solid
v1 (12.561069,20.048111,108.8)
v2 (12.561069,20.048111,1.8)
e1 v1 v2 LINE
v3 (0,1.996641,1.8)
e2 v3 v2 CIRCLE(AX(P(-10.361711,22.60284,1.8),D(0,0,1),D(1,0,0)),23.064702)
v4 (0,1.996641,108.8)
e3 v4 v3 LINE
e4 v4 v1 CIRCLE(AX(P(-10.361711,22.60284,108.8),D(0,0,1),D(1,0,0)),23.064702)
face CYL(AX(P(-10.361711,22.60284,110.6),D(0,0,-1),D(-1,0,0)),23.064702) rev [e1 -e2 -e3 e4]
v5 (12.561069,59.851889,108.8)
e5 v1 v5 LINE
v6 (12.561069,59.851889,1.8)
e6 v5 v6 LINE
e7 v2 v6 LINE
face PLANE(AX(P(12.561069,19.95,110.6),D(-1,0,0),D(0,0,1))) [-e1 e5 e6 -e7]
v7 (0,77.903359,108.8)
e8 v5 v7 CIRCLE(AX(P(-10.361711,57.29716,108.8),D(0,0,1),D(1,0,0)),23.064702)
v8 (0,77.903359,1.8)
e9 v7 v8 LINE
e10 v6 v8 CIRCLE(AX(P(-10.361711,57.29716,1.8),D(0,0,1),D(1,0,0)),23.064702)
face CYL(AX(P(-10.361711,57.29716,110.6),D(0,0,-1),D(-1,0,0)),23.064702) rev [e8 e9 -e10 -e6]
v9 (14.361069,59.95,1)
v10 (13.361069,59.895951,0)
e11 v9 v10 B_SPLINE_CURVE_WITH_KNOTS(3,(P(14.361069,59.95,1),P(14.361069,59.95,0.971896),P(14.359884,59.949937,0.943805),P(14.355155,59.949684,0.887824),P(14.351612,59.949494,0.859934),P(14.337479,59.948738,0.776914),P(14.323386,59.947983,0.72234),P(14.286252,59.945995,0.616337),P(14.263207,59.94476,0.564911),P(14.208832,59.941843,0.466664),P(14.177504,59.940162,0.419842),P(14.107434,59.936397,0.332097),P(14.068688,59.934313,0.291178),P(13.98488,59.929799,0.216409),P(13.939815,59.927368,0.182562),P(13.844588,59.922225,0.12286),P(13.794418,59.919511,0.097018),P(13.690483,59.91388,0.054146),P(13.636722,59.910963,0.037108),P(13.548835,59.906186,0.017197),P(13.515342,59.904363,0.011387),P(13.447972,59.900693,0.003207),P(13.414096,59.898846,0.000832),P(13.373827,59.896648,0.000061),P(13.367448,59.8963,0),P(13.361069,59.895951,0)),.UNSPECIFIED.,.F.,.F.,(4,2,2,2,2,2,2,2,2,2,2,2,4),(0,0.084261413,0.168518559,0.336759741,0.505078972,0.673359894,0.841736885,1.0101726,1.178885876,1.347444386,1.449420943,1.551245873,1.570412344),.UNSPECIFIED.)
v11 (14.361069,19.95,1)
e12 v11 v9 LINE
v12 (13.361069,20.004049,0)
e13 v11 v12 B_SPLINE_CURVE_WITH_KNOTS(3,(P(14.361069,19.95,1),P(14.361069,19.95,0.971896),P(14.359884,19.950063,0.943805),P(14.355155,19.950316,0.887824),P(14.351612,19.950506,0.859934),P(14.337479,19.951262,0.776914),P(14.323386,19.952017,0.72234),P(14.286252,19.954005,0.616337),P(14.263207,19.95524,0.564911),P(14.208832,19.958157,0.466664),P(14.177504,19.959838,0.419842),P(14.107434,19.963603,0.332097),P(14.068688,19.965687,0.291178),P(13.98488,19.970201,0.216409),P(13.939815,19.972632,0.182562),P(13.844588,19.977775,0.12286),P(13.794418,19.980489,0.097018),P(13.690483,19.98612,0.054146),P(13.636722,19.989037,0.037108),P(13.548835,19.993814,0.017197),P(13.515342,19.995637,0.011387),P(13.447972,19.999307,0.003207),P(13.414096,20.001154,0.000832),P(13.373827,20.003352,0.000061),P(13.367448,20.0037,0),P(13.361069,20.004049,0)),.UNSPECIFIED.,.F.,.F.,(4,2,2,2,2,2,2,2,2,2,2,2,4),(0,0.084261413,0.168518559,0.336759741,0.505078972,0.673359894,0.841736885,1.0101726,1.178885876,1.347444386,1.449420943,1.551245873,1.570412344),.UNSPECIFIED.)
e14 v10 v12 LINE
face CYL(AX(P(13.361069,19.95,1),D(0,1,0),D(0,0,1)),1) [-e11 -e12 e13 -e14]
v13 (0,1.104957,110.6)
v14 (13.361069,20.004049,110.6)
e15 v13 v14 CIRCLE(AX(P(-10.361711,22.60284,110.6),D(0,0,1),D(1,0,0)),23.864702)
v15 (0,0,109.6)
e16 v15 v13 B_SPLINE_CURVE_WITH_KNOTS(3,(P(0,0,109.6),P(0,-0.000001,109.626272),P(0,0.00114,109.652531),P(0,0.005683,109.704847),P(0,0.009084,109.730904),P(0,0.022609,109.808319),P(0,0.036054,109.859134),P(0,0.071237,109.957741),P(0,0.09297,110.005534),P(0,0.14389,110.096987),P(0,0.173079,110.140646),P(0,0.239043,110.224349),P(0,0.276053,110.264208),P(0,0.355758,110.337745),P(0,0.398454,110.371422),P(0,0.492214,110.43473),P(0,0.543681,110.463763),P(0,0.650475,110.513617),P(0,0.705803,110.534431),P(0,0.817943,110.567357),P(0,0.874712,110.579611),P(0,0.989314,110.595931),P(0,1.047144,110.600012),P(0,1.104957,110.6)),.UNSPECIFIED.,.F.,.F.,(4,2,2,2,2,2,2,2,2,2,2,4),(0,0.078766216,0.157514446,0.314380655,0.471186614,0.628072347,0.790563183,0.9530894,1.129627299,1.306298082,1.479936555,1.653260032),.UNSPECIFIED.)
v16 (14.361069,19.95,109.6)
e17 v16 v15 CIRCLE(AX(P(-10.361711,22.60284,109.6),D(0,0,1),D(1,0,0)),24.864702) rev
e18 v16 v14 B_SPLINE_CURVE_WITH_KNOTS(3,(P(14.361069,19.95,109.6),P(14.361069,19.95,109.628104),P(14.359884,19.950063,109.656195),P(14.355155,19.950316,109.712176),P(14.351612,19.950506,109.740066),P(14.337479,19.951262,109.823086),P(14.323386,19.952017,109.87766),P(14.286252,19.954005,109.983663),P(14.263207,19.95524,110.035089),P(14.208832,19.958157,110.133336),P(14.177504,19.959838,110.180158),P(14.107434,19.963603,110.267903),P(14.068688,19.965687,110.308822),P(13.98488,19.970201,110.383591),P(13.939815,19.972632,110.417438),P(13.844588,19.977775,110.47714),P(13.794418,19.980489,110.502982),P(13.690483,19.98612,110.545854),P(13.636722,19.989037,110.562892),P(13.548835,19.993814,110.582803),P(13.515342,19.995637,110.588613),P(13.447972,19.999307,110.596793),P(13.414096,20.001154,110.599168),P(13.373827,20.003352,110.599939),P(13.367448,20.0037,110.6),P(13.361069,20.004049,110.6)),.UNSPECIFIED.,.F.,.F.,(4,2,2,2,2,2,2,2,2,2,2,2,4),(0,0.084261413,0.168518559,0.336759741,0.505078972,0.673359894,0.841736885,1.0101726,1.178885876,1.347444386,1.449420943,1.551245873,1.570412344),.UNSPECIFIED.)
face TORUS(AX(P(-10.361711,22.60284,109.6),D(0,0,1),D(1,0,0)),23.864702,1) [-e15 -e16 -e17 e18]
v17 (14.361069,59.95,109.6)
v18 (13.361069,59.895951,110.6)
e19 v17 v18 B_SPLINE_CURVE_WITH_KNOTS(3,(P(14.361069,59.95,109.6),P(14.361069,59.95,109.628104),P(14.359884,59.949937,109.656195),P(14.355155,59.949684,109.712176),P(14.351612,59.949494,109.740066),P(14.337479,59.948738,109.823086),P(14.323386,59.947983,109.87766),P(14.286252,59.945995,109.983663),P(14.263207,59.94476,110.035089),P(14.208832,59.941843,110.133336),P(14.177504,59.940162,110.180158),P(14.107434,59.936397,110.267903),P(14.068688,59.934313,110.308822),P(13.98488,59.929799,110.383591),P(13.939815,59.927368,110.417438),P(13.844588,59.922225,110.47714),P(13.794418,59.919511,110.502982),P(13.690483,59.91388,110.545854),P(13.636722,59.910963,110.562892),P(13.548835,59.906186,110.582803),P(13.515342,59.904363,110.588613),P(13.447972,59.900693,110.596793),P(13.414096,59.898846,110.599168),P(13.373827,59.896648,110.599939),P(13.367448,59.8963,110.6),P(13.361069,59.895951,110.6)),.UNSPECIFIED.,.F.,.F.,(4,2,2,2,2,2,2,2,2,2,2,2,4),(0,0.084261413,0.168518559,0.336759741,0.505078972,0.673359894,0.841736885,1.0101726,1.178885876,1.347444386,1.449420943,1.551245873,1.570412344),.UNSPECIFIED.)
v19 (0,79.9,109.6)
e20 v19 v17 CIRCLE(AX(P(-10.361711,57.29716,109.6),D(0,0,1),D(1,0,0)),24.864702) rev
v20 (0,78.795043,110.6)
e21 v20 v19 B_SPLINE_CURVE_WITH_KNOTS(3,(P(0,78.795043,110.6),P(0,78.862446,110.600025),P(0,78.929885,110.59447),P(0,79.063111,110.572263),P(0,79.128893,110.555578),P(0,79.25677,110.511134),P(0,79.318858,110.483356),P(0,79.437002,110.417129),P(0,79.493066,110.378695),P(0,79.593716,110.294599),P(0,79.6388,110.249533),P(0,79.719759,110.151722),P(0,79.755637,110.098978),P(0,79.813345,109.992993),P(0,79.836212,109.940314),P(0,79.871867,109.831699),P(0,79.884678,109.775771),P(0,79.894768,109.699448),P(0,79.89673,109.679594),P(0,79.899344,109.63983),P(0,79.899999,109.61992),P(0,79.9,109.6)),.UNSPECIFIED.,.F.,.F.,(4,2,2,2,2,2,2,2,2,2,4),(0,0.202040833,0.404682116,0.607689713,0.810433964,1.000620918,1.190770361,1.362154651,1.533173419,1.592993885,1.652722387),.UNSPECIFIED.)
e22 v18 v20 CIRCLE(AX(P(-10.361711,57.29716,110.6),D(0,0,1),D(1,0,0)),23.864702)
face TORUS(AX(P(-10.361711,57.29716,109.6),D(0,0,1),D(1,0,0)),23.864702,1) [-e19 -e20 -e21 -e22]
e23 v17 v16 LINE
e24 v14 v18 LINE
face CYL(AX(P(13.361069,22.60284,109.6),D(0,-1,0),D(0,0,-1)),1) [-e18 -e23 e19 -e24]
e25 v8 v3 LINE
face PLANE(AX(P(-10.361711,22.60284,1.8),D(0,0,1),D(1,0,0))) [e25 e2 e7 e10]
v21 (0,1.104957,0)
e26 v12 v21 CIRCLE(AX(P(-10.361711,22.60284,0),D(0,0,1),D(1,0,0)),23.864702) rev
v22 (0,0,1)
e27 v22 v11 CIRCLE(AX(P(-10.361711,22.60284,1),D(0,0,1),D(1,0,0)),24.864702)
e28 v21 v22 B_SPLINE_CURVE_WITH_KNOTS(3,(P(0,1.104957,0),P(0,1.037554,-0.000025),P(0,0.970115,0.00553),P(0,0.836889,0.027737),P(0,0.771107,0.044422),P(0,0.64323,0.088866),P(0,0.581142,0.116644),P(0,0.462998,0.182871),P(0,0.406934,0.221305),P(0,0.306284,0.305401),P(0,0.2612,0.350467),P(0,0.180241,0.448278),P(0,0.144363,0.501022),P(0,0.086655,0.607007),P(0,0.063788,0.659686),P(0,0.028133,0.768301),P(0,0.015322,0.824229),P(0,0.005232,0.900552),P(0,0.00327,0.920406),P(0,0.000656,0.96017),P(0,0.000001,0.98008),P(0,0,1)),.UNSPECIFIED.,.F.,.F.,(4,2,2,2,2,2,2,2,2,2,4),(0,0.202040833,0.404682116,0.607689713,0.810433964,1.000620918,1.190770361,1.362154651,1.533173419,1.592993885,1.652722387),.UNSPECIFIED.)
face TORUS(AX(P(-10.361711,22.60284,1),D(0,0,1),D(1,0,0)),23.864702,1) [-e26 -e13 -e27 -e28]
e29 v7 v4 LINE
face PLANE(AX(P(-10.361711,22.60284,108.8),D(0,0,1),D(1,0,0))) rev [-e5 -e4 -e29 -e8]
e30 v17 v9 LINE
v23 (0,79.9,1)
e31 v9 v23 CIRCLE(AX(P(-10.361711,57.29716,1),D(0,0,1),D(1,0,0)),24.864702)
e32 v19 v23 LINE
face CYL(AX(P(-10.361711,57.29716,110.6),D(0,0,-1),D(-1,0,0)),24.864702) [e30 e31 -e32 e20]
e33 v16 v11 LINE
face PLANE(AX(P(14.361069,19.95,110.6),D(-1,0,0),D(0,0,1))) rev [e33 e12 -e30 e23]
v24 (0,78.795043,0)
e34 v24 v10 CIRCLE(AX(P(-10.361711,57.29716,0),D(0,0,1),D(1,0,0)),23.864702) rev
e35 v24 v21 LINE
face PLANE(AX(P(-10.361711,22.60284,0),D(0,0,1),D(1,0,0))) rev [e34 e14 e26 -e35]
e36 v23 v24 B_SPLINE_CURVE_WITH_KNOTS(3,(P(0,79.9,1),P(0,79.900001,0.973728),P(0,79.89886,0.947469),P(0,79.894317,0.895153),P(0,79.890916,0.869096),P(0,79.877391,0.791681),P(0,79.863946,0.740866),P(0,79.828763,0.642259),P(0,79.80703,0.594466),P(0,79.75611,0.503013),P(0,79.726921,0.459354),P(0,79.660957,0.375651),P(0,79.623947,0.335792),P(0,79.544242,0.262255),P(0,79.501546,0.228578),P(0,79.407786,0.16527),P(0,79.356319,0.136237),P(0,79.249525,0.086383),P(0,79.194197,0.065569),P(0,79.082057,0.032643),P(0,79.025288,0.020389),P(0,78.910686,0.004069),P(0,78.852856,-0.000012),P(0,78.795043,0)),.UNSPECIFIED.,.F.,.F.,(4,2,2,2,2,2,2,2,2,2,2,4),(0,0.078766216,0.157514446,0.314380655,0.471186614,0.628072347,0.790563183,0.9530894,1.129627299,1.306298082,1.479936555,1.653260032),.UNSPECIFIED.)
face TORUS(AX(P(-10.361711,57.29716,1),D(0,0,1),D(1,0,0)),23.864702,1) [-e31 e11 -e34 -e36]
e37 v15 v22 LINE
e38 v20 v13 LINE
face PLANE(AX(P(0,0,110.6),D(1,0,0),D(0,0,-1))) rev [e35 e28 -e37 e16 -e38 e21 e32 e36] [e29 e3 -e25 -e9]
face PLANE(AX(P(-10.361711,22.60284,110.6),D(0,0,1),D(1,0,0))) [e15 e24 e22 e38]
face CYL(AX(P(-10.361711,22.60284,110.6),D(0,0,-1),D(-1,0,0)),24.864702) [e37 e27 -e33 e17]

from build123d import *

# Parameters (mm, degrees)
MAIN_SHAPE_DEPTH = 110.6
HOLLOW_T         = -1.8
FILLETS_R        = 1


with BuildPart() as part:
    # Sketch for the main shape → Main shape (new body)
    with BuildSketch(Plane.XY):
        with BuildLine():
            Line((14.361069392, 19.95), (14.361069392, 59.95))
            ThreePointArc((14.361069392, 59.95), (9.818254591, 71.823770849), (0, 79.9))
            Line((0, 79.9), (0, 0))
            ThreePointArc((0, 0), (9.818254591, 8.076229151), (14.361069392, 19.95))
        make_face()
    extrude(amount=MAIN_SHAPE_DEPTH)

    # Hollow
    hollow_openings = [part.faces().sort_by_distance(p)[0] for p in [
        (0, 39.95, 55.3),
    ]]
    offset(amount=HOLLOW_T, openings=hollow_openings, kind=Kind.INTERSECTION)

    # Fillets
    # the kernel refuses this fillet: 1 mm, written as the material it takes off along each edge
    with BuildSketch(Plane(origin=(-10.361710586, 57.297160312, 110.6), x_dir=(0.9999799478441757, 0.006332764764284822, 0), z_dir=(0.006332764764284822, -0.9999799478441757, 0))) as fillets_piece_1:
        with BuildLine():
            CenterArc((24.864702054 - FILLETS_R, -FILLETS_R), FILLETS_R, 0, 90)
            Line((24.864702054 - FILLETS_R, 0), (24.864702054, 0))
            Line((24.864702054, 0), (24.864702054, -FILLETS_R))
        make_face()
    revolve(axis=Axis((-10.361710586, 57.297160312, 110.6), (0, 0, 1)), revolution_arc=70.771001335, mode=Mode.SUBTRACT)
    with BuildSketch(Plane(origin=(-10.361710586, 22.602839688, 110.6), x_dir=(0.32335851179223435, -0.9462765308573977, 0), z_dir=(-0.9462765308573977, -0.32335851179223435, 0))) as fillets_piece_2:
        with BuildLine():
            CenterArc((24.864702054 - FILLETS_R, -FILLETS_R), FILLETS_R, 0, 90)
            Line((24.864702054 - FILLETS_R, 0), (24.864702054, 0))
            Line((24.864702054, 0), (24.864702054, -FILLETS_R))
        make_face()
    revolve(axis=Axis((-10.361710586, 22.602839688, 110.6), (0, 0, 1)), revolution_arc=70.771001335, mode=Mode.SUBTRACT)
    with BuildSketch(Plane(origin=(-10.361710586, 57.297160312, 0), x_dir=(0.9999799478441757, 0.006332764764284822, 0), z_dir=(0.006332764764284822, -0.9999799478441757, 0))) as fillets_piece_3:
        with BuildLine():
            CenterArc((24.864702054 - FILLETS_R, FILLETS_R), FILLETS_R, 270, 90)
            Line((24.864702054 - FILLETS_R, 0), (24.864702054, 0))
            Line((24.864702054, 0), (24.864702054, FILLETS_R))
        make_face()
    revolve(axis=Axis((-10.361710586, 57.297160312, 0), (0, 0, 1)), revolution_arc=70.771001335, mode=Mode.SUBTRACT)
    with BuildSketch(Plane(origin=(14.361069392, 17.45, 0), x_dir=(0, 0, 1), z_dir=(0, 1, 0))) as fillets_piece_4:
        with BuildLine():
            CenterArc((FILLETS_R, -FILLETS_R), FILLETS_R, 90, 90)
            Line((0, -FILLETS_R), (0, 0))
            Line((0, 0), (FILLETS_R, 0))
        make_face()
    extrude(amount=45, mode=Mode.SUBTRACT)
    with BuildSketch(Plane(origin=(-10.361710586, 22.602839688, 0), x_dir=(0.32335851179223435, -0.9462765308573977, 0), z_dir=(-0.9462765308573977, -0.32335851179223435, 0))) as fillets_piece_5:
        with BuildLine():
            CenterArc((24.864702054 - FILLETS_R, FILLETS_R), FILLETS_R, 270, 90)
            Line((24.864702054 - FILLETS_R, 0), (24.864702054, 0))
            Line((24.864702054, 0), (24.864702054, FILLETS_R))
        make_face()
    revolve(axis=Axis((-10.361710586, 22.602839688, 0), (0, 0, 1)), revolution_arc=70.771001335, mode=Mode.SUBTRACT)
    with BuildSketch(Plane(origin=(14.361069392, 17.45, 110.6), x_dir=(0, 0, -1), z_dir=(0, 1, 0))) as fillets_piece_6:
        with BuildLine():
            CenterArc((FILLETS_R, FILLETS_R), FILLETS_R, 180, 90)
            Line((0, FILLETS_R), (0, 0))
            Line((0, 0), (FILLETS_R, 0))
        make_face()
    extrude(amount=45, mode=Mode.SUBTRACT)


solid = part.part
